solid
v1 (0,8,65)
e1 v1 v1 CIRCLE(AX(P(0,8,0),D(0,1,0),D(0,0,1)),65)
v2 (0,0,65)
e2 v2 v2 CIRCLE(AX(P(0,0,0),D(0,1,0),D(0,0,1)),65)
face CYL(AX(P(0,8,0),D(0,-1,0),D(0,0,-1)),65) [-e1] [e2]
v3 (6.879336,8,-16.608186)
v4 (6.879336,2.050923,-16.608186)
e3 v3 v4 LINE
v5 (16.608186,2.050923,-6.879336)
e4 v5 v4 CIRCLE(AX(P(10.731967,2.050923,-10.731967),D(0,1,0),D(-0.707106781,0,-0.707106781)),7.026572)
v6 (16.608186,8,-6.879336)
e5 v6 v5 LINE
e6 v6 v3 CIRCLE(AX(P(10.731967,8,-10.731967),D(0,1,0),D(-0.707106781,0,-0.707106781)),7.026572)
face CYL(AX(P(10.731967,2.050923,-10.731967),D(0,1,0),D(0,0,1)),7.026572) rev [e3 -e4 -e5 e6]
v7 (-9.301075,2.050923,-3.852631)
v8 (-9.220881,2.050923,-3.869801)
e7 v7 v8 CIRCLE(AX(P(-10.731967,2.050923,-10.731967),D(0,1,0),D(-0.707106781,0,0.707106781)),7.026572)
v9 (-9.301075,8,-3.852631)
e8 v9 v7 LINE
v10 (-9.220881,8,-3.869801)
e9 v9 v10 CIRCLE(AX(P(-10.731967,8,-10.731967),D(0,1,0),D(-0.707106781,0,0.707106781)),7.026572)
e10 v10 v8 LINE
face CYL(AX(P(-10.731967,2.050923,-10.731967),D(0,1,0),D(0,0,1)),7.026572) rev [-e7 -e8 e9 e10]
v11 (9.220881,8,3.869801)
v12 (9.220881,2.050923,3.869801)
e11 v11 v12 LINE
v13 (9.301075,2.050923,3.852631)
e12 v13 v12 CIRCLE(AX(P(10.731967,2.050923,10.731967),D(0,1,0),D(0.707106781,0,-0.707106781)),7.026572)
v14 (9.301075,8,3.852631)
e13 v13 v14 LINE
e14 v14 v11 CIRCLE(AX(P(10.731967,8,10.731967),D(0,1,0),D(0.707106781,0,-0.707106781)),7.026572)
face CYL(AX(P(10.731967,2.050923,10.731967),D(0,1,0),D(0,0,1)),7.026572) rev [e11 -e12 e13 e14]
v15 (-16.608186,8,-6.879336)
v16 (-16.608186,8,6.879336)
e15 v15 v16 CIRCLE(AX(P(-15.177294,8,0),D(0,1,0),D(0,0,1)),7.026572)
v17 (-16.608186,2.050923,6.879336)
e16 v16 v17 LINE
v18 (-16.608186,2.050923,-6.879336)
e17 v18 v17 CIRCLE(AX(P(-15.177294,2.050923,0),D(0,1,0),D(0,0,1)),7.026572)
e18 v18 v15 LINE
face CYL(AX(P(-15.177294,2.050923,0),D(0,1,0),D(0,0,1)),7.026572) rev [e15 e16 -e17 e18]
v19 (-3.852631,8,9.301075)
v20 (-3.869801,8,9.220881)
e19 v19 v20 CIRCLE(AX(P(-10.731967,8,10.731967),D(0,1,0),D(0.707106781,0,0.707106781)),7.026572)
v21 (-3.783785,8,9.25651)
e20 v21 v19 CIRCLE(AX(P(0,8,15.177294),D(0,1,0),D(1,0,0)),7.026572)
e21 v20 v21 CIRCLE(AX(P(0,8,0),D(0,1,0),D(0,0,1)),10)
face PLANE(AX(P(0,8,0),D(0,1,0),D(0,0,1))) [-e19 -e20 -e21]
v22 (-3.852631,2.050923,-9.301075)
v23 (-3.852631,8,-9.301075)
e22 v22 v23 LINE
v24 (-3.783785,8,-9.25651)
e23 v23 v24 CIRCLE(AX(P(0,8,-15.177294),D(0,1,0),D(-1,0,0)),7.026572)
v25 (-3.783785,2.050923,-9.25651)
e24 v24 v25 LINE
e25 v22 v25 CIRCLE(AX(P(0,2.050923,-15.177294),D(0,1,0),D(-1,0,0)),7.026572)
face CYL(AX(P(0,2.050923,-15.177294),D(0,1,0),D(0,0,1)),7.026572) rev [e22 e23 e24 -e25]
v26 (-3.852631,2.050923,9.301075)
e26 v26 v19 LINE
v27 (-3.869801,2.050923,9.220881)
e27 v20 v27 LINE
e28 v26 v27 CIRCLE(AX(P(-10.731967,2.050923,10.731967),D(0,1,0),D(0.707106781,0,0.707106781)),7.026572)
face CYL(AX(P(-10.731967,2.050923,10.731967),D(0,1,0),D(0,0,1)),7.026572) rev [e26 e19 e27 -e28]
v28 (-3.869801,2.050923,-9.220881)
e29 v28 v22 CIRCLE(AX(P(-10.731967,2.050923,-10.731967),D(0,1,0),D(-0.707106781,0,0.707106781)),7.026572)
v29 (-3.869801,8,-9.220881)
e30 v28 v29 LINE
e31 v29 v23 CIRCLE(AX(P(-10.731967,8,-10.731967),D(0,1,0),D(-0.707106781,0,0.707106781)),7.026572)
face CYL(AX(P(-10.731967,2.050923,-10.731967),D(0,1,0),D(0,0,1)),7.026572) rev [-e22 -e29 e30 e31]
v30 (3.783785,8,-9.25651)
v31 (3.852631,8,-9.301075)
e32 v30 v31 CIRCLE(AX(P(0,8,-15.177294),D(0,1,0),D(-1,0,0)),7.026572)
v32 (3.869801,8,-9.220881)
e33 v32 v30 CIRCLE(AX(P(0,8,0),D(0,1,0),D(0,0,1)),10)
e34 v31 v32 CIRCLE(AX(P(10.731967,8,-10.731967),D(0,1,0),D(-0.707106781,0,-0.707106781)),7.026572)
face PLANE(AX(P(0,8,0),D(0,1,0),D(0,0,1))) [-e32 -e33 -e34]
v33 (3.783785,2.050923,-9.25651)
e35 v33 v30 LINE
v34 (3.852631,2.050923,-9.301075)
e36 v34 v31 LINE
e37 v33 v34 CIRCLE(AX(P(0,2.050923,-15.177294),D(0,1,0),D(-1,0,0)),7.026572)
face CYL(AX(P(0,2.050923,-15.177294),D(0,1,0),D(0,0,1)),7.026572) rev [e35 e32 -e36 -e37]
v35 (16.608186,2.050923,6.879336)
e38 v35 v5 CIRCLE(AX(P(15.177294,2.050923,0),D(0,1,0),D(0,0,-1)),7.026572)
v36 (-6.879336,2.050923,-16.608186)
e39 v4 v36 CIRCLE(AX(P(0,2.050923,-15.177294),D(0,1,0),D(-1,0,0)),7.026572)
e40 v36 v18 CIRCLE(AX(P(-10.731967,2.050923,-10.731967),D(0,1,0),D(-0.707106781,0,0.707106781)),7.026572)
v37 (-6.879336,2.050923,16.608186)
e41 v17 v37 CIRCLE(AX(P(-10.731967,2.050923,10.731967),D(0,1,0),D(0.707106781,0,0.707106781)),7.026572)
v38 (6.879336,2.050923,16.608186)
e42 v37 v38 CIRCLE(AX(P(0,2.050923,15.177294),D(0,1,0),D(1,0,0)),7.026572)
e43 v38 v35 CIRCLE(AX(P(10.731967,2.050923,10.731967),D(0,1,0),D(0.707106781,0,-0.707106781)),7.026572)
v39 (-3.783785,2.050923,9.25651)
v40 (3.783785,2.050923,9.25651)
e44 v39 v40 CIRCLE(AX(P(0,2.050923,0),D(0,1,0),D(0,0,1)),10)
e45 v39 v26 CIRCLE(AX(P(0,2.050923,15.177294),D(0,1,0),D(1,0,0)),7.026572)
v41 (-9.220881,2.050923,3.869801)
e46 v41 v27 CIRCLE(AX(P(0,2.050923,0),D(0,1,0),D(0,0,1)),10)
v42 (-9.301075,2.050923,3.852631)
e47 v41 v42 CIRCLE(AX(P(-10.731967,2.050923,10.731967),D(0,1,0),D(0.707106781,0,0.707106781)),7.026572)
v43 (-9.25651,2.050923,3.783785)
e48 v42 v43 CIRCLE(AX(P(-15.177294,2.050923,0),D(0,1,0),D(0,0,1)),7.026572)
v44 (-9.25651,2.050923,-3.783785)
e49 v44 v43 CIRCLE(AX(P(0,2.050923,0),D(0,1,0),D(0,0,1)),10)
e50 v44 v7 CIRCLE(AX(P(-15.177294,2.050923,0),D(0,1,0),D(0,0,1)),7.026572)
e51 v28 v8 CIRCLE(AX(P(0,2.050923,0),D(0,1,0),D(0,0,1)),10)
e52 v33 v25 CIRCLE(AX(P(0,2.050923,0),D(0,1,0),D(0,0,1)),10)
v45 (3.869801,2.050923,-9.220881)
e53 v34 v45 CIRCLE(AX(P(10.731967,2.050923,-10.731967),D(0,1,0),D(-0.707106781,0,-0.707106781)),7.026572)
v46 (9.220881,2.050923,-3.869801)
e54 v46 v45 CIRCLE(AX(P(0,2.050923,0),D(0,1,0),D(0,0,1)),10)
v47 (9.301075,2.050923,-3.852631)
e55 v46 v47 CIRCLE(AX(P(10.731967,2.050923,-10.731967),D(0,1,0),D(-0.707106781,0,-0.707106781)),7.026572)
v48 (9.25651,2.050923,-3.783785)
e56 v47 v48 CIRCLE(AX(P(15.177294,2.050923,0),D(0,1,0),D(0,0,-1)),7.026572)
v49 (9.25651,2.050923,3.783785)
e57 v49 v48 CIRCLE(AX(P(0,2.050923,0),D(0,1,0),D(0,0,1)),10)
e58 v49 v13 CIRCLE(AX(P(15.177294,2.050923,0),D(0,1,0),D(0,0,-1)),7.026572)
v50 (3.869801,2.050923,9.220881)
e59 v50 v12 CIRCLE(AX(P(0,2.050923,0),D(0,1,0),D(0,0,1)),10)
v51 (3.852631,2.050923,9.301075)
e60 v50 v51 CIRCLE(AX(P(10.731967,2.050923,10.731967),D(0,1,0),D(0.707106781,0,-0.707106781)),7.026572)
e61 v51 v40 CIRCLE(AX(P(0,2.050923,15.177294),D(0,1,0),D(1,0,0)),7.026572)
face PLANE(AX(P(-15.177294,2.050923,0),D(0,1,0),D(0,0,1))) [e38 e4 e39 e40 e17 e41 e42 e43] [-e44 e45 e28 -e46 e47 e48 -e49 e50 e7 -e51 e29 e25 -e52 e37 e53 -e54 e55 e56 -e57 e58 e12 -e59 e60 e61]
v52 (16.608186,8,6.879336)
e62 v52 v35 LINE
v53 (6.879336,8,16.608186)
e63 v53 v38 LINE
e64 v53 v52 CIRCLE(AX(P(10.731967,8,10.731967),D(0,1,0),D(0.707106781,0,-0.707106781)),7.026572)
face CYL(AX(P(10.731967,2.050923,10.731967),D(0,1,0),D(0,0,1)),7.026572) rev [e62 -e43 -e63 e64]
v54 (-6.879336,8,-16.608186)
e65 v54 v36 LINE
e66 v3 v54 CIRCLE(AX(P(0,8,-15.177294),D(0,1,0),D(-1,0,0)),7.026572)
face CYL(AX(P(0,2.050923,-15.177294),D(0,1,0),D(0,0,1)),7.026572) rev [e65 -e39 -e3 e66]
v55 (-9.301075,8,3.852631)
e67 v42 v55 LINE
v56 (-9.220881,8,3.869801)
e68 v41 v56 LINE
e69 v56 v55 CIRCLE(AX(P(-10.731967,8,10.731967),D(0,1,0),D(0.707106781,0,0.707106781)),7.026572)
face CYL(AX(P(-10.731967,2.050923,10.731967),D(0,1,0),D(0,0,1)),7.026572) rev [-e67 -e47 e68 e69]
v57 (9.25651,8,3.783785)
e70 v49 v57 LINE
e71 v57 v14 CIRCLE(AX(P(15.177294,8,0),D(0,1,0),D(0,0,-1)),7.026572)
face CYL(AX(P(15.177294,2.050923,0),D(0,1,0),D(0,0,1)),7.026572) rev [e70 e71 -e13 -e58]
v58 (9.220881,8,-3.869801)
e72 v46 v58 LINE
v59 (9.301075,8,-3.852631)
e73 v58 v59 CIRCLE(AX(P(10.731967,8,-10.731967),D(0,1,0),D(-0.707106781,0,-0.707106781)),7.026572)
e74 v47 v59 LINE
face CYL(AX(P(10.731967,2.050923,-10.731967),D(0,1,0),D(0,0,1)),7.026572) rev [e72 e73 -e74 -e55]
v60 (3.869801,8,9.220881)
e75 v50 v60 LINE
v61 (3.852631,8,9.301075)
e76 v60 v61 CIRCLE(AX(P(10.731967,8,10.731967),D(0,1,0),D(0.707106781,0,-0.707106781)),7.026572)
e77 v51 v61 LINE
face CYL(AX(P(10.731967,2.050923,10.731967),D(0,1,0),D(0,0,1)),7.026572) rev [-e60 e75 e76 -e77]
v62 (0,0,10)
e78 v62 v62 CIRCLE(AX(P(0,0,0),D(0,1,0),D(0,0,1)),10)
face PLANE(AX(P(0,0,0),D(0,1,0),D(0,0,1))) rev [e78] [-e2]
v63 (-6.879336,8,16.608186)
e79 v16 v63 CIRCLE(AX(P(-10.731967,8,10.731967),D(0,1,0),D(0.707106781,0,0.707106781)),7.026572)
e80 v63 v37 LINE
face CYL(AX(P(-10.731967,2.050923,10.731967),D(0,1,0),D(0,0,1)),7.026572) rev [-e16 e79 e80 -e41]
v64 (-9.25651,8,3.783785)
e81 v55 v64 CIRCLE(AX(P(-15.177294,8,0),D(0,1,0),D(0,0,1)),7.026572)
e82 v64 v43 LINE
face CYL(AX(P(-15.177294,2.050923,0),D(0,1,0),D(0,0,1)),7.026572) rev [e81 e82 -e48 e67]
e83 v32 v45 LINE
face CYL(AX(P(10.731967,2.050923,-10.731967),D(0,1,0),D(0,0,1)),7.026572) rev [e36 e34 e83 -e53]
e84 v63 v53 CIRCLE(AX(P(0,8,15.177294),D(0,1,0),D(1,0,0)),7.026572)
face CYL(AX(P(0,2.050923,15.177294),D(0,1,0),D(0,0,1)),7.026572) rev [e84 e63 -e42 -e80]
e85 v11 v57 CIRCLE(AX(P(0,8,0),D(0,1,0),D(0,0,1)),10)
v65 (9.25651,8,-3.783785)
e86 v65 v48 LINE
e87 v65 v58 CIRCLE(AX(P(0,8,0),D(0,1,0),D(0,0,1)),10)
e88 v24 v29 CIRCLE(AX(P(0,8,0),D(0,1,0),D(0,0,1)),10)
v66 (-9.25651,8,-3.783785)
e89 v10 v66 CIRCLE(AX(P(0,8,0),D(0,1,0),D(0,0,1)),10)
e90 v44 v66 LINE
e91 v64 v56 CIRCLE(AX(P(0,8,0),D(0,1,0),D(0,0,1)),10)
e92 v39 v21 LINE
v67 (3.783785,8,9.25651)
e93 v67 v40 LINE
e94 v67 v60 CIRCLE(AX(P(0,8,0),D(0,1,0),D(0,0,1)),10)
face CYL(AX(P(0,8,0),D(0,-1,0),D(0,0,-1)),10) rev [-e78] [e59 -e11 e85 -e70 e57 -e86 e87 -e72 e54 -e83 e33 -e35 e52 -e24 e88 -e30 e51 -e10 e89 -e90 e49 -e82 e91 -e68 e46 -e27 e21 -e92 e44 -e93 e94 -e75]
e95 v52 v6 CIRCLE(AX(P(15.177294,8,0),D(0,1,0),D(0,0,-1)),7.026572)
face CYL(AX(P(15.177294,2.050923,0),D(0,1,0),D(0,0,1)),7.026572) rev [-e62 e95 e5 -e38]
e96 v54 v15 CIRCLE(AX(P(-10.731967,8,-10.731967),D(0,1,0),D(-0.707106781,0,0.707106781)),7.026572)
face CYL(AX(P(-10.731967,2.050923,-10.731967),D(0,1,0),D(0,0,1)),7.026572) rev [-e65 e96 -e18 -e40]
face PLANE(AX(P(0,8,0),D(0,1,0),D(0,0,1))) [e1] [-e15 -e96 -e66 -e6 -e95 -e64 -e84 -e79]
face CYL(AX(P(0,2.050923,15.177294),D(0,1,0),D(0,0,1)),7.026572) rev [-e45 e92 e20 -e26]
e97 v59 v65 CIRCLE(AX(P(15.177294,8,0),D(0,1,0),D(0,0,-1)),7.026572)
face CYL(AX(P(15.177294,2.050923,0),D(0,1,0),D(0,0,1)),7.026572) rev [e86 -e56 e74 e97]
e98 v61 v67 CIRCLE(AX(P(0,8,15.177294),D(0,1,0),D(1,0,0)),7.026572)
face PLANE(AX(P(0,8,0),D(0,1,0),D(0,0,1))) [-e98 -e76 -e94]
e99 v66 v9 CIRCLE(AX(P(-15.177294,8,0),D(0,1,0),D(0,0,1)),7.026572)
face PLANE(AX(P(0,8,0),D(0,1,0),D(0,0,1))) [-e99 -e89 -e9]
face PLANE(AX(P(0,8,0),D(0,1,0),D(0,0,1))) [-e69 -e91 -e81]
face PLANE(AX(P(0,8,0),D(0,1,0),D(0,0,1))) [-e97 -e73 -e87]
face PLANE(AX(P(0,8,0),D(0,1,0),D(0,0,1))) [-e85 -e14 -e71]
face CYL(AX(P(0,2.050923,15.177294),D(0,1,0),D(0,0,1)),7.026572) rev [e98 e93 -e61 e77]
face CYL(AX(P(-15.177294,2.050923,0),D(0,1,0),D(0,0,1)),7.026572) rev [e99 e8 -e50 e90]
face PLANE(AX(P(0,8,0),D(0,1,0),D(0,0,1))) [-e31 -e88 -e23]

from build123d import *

# Parameters (mm, degrees)
SKETCH1_R           = 65
BOSS_EXTRUDE1_DEPTH = 8
SKETCH2_R           = 10
CUT_EXTRUDE1_DEPTH  = 93.271338995
SKETCH3_R           = 7.026572085
CUT_EXTRUDE2_DEPTH  = 5.949077474
CIRPATTERN1_COUNT   = 8


with BuildPart() as part:
    # Sketch1 → Boss-Extrude1 (new body)
    with BuildSketch(Plane(origin=(0, 0, 0), x_dir=(1, 0, 0), z_dir=(0, 1, 0))):
        Circle(SKETCH1_R)
    extrude(amount=BOSS_EXTRUDE1_DEPTH)

    # Sketch2 → Cut-Extrude1 (cut, through all)
    with BuildSketch(Plane(origin=(0, 0, 0), x_dir=(1, 0, 0), z_dir=(0, 1, 0))):
        Circle(SKETCH2_R)
    extrude(amount=CUT_EXTRUDE1_DEPTH, mode=Mode.SUBTRACT)

    # Sketch3 → Cut-Extrude2 (cut)
    with BuildSketch(Plane(origin=(0, 8, 0), x_dir=(1, 0, 0), z_dir=(0, 1, 0))):
        with Locations((-15.177293881, 0)):
            Circle(SKETCH3_R)
    cut_extrude2 = extrude(amount=-CUT_EXTRUDE2_DEPTH, mode=Mode.SUBTRACT)

    # CirPattern1: Cut-Extrude2 ×8 about axis
    cirpattern1_axis = Axis((0, 0, 0), (0, 1, 0))
    for i in range(1, CIRPATTERN1_COUNT):
        add(cut_extrude2.rotate(cirpattern1_axis, i * 360 / CIRPATTERN1_COUNT), mode=Mode.SUBTRACT)


solid = part.part
